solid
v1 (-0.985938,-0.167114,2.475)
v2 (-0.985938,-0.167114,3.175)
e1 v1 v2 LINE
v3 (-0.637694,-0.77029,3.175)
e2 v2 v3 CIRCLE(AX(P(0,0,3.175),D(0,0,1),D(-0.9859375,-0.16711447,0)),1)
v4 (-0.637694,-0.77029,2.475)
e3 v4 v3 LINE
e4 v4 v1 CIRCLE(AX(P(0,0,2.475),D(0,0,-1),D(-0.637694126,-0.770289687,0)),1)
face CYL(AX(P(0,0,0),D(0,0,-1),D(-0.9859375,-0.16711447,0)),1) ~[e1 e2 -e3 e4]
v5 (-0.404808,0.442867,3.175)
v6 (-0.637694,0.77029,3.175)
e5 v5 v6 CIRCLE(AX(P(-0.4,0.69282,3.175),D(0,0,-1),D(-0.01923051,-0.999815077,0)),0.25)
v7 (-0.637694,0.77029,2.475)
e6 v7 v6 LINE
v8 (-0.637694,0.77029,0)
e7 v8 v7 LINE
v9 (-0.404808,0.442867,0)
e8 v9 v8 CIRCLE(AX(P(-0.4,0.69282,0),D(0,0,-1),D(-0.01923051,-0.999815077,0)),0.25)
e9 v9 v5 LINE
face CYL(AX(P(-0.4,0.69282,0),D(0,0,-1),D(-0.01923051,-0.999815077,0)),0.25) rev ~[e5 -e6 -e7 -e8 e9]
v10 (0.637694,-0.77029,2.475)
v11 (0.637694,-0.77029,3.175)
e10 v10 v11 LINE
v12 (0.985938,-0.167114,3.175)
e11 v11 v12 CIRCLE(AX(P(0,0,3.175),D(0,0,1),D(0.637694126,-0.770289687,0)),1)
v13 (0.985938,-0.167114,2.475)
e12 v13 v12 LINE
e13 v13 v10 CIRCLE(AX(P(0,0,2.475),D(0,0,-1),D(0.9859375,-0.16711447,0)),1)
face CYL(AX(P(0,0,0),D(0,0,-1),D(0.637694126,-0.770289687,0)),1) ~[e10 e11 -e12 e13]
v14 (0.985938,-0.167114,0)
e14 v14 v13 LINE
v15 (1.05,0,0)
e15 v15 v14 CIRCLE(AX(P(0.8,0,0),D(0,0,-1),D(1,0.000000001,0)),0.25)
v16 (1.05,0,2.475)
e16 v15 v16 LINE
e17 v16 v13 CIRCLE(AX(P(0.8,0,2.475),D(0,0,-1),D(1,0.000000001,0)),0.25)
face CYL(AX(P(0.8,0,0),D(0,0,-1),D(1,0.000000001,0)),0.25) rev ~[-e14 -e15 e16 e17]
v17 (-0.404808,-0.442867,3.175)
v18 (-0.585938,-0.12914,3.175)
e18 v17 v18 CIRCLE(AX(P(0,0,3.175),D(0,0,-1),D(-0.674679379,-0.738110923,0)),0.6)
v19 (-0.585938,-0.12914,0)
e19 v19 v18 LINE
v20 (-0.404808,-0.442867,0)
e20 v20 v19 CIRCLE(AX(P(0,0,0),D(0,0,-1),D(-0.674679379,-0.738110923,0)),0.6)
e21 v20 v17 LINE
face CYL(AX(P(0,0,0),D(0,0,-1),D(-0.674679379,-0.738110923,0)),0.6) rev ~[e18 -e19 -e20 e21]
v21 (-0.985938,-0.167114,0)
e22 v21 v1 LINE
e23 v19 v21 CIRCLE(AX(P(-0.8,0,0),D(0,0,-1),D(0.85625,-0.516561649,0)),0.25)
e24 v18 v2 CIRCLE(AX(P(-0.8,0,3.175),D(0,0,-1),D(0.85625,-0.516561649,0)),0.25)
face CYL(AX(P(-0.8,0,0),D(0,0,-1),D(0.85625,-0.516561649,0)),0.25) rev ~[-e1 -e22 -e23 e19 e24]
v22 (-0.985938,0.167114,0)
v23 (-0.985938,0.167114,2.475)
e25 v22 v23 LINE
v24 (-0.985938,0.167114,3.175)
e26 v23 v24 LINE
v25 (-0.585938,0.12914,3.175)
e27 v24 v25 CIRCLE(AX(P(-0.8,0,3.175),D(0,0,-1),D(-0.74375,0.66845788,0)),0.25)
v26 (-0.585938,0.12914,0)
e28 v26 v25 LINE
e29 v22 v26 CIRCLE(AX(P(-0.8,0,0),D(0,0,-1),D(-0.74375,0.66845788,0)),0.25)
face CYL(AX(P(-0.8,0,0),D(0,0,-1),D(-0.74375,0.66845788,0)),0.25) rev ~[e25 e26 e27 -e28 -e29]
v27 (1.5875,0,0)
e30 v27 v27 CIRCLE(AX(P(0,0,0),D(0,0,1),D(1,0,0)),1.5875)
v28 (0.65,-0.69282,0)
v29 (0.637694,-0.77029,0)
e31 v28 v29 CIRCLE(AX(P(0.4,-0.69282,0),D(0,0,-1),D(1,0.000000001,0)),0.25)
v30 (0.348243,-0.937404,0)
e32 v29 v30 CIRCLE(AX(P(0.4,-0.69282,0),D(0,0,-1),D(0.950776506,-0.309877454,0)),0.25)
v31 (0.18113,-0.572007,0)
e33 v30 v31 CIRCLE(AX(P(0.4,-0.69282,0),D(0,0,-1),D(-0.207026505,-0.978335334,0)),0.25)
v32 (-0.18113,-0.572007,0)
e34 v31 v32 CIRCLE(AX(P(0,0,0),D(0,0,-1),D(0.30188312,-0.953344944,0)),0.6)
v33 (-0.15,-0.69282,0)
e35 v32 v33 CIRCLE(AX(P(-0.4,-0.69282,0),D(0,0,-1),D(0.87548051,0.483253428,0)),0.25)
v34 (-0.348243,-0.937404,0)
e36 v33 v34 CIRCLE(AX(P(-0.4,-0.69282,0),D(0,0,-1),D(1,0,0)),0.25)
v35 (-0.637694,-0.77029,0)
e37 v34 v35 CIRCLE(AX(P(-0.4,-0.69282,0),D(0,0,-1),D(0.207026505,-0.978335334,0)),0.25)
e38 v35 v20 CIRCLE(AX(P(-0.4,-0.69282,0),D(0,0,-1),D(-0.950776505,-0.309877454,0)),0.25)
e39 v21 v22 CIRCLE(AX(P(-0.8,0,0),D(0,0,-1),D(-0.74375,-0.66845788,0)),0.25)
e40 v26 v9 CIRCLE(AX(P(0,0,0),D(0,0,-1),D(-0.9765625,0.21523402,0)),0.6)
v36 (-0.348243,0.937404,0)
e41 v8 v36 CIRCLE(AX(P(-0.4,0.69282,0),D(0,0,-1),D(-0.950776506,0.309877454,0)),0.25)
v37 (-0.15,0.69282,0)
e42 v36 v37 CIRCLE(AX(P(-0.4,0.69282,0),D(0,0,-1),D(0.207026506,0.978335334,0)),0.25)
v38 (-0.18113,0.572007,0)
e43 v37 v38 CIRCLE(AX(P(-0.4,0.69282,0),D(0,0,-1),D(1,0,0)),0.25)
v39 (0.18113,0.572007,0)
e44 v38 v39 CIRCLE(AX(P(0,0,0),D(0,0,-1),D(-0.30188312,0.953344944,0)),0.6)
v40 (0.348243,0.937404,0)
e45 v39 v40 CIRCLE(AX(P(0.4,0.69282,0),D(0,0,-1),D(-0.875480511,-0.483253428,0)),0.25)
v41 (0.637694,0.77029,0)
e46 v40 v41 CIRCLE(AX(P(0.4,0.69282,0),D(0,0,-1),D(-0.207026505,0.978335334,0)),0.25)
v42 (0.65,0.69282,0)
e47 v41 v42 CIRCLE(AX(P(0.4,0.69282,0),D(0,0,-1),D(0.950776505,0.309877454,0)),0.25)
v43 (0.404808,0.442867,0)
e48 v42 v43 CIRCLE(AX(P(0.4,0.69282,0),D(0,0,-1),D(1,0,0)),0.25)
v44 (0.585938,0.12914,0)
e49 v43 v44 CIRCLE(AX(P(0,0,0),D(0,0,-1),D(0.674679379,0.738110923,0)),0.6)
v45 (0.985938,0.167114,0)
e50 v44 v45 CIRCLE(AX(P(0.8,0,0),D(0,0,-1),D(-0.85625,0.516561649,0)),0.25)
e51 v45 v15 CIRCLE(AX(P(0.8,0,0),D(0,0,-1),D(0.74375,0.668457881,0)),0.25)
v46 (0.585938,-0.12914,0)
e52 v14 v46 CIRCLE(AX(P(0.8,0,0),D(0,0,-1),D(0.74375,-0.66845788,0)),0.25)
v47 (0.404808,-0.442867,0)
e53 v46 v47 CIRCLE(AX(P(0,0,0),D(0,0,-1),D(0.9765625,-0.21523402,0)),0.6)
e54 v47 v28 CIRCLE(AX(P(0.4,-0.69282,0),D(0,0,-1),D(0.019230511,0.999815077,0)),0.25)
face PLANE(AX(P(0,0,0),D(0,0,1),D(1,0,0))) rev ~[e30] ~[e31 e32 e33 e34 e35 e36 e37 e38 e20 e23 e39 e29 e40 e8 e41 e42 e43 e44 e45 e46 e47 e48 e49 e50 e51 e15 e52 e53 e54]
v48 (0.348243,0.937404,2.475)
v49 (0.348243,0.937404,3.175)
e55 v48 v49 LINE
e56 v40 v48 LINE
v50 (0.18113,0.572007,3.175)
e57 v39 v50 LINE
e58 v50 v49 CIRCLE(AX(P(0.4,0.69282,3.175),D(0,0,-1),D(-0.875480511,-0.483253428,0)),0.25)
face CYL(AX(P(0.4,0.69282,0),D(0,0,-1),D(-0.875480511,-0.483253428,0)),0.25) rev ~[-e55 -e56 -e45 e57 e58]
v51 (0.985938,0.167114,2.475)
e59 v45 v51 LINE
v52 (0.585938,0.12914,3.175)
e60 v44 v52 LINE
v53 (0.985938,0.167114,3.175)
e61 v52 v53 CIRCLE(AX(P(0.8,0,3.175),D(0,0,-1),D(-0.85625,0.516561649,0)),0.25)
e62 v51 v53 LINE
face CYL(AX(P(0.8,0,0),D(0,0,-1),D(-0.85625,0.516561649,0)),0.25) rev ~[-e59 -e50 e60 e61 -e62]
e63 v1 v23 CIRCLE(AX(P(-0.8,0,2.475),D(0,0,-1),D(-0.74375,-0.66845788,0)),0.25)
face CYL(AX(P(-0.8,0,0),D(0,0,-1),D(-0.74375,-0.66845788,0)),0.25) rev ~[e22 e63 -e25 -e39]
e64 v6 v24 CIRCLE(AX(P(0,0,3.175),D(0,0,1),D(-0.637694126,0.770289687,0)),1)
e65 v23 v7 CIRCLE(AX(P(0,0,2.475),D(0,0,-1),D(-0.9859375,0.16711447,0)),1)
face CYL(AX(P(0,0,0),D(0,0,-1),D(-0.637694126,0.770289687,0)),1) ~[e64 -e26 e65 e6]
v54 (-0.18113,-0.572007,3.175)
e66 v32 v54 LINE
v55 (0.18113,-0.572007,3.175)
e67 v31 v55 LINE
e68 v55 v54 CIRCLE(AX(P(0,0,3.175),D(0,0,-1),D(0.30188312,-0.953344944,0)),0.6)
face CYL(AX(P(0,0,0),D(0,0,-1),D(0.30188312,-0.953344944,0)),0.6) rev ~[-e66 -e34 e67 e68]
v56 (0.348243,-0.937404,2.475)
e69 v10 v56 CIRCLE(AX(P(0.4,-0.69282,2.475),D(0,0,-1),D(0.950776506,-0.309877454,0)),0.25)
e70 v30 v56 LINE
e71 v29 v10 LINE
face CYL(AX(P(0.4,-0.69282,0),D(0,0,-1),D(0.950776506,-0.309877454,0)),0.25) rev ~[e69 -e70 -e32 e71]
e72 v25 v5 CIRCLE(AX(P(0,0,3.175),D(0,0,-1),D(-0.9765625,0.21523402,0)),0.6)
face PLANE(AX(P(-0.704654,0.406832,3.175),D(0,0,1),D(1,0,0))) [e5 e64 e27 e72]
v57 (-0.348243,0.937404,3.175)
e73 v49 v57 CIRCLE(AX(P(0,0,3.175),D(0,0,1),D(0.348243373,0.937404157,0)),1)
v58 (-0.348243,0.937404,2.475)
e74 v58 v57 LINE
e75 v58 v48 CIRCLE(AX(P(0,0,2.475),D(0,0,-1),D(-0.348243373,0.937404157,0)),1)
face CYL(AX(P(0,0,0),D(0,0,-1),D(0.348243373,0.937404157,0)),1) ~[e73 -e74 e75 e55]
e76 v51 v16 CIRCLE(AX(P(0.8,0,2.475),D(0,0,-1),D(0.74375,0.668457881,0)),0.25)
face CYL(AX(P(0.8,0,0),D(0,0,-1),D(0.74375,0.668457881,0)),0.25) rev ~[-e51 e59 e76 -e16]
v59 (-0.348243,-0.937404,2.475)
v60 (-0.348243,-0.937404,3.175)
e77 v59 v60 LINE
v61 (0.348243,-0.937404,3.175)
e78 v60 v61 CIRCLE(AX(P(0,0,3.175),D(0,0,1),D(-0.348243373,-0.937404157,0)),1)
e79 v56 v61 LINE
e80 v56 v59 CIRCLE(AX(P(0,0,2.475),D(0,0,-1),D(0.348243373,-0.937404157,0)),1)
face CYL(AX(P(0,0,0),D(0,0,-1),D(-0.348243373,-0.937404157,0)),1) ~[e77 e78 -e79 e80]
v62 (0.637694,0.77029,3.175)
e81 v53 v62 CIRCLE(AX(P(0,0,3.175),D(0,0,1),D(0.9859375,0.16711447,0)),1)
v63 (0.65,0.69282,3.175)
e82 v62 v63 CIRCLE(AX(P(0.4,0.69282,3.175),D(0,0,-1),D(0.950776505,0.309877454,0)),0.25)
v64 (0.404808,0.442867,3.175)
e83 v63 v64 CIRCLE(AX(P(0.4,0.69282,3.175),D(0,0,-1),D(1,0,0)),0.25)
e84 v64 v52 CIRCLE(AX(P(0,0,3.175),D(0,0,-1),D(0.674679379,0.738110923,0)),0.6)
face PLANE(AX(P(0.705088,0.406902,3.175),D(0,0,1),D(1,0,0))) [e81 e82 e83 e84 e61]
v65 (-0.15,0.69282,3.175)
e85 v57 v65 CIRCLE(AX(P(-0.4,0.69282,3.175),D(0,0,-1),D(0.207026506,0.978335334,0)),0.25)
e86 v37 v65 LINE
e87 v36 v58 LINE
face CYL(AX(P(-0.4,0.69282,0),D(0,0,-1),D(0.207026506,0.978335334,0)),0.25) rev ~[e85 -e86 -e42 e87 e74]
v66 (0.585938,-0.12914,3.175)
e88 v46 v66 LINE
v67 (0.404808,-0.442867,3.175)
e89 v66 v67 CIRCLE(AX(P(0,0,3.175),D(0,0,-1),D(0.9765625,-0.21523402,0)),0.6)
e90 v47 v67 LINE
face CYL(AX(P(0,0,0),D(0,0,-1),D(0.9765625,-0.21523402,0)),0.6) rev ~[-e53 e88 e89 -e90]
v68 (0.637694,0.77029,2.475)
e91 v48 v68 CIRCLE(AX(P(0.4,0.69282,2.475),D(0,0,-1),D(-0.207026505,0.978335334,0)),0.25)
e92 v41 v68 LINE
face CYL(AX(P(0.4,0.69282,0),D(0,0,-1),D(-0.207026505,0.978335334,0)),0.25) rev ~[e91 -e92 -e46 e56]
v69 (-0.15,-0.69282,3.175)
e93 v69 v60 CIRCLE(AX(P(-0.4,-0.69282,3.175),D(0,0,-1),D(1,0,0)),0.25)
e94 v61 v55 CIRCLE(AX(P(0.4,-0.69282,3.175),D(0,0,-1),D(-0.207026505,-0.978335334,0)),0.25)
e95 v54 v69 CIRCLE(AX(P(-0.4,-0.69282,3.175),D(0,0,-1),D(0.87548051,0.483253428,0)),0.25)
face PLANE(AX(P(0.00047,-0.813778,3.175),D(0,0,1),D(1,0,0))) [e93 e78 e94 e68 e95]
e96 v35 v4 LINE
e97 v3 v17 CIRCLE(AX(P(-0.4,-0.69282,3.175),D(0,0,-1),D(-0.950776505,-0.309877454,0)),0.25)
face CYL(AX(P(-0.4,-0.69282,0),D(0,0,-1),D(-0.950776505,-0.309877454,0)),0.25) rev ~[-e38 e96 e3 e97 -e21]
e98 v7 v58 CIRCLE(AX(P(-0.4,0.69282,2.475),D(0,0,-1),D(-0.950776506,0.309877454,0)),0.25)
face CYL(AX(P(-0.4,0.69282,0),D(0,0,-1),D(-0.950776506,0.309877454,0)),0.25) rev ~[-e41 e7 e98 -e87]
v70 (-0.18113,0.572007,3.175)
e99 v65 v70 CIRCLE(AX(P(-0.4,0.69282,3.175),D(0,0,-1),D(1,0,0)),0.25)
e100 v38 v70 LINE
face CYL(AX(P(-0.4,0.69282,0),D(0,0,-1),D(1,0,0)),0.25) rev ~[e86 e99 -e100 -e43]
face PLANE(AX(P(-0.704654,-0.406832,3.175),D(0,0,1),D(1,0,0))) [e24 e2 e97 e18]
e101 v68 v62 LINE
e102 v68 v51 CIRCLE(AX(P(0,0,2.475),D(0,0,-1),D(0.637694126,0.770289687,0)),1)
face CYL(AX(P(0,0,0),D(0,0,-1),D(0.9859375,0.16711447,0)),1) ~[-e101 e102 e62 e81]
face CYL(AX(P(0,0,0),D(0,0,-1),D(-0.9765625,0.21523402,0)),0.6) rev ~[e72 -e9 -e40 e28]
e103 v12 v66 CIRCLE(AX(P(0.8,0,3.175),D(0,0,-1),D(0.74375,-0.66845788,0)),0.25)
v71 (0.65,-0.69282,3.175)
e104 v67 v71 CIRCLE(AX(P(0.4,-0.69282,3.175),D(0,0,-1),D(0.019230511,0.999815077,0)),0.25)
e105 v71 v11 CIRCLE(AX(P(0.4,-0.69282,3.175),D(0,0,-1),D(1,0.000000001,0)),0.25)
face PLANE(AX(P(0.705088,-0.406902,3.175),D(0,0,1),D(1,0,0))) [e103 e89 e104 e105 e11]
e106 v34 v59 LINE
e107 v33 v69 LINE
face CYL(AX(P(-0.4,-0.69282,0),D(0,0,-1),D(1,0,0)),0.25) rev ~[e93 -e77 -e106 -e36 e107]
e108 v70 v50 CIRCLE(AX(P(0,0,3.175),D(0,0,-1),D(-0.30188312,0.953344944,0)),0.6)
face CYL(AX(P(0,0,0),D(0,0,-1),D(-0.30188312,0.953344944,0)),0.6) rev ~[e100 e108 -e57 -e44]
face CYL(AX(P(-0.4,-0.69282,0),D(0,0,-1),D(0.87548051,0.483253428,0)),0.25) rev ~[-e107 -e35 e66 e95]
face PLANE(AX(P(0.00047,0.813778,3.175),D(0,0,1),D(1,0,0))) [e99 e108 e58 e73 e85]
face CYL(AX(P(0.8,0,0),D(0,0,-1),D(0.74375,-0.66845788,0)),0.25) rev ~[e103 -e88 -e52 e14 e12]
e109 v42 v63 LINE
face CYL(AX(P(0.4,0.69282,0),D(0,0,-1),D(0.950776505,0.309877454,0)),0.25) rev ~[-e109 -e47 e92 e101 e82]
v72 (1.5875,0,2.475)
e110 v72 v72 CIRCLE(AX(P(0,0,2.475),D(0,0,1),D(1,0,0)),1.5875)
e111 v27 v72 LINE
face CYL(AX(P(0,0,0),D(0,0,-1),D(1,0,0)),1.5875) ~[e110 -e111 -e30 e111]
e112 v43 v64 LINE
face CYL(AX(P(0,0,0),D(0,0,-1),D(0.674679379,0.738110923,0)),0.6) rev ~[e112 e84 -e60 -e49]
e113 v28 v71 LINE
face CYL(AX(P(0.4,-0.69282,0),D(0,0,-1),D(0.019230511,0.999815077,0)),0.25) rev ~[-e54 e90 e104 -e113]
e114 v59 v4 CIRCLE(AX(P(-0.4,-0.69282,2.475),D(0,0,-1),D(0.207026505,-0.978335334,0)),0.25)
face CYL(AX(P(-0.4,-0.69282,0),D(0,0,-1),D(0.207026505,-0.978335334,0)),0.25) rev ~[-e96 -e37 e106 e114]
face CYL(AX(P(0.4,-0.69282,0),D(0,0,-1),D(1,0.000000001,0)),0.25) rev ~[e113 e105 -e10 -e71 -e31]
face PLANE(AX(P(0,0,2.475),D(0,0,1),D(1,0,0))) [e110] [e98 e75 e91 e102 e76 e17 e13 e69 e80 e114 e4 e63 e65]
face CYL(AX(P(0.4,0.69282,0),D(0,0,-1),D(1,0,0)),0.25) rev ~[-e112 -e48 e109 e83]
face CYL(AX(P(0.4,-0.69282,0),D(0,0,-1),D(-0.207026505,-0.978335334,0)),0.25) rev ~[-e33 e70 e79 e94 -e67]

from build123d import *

# Parameters (mm, degrees)
F1_DEPTH = 3.175
F0_R     = 1.5875
F2_DEPTH = 2.475


# Not quite as in the source:
# - a length typed as a fraction of an inch, garbled in the dataset ("3 / 203.2 mm" for 3/8 in), is restored


with BuildPart() as f1:
    # F0 (on Top) → F1 (new body)
    with BuildSketch(Plane.XY):
        with BuildLine():
            ThreePointArc((-0.5859375, 0.1291404123), (-0.5196152423, 0.3), (-0.4048076277, 0.4428665539))
            ThreePointArc((-0.4048076277, 0.4428665539), (-0.6037234698, 0.5479177769), (-0.6376941264, 0.7702896865))
            ThreePointArc((-0.6376941264, 0.7702896865), (-0.8660254038, 0.5), (-0.9859375, 0.16711447))
            ThreePointArc((-0.9859375, 0.16711447), (-0.7763724489, 0.2488809732), (-0.5859375, 0.1291404123))
        make_face()
    extrude(amount=F1_DEPTH)



with BuildPart() as f1b:
    # F0 (on Top) → F1, piece 2 (new body)
    with BuildSketch(Plane.XY):
        with BuildLine():
            ThreePointArc((-0.1811298723, 0.5720069662), (0, 0.6), (0.1811298723, 0.5720069662))
            ThreePointArc((0.1811298723, 0.5720069662), (0.1726489791, 0.7967987502), (0.3482433736, 0.9374041566))
            ThreePointArc((0.3482433736, 0.9374041566), (0, 1), (-0.3482433736, 0.9374041566))
            ThreePointArc((-0.3482433736, 0.9374041566), (-0.2057847115, 0.8502383071), (-0.15, 0.692820323))
            ThreePointArc((-0.15, 0.692820323), (-0.157907526, 0.6304405664), (-0.1811298723, 0.5720069662))
        make_face()
    extrude(amount=F1_DEPTH)


with BuildPart() as f1c:
    # F0 (on Top) → F1, piece 3 (new body)
    with BuildSketch(Plane.XY):
        with BuildLine():
            ThreePointArc((0.4048076277, 0.4428665539), (0.5196152423, 0.3), (0.5859375, 0.1291404123))
            ThreePointArc((0.5859375, 0.1291404123), (0.7763724489, 0.2488809732), (0.9859375, 0.16711447))
            ThreePointArc((0.9859375, 0.16711447), (0.8660254038, 0.5), (0.6376941264, 0.7702896865))
            ThreePointArc((0.6376941264, 0.7702896865), (0.6469043657, 0.732040652), (0.65, 0.692820323))
            ThreePointArc((0.65, 0.692820323), (0.5784683542, 0.5177516321), (0.4048076277, 0.4428665539))
        make_face()
    extrude(amount=F1_DEPTH)


with BuildPart() as f1d:
    # F0 (on Top) → F1, piece 4 (new body)
    with BuildSketch(Plane.XY):
        with BuildLine():
            ThreePointArc((0.9859375, -0.16711447), (0.7763724489, -0.2488809732), (0.5859375, -0.1291404123))
            ThreePointArc((0.5859375, -0.1291404123), (0.5196152423, -0.3), (0.4048076277, -0.4428665539))
            ThreePointArc((0.4048076277, -0.4428665539), (0.5784683542, -0.5177516321), (0.65, -0.692820323))
            ThreePointArc((0.65, -0.692820323), (0.6469043657, -0.732040652), (0.6376941264, -0.7702896865))
            ThreePointArc((0.6376941264, -0.7702896865), (0.8660254038, -0.5), (0.9859375, -0.16711447))
        make_face()
    extrude(amount=F1_DEPTH)


with BuildPart() as f1e:
    # F0 (on Top) → F1, piece 5 (new body)
    with BuildSketch(Plane.XY):
        with BuildLine():
            ThreePointArc((0.3482433736, -0.9374041566), (0.1726489791, -0.7967987502), (0.1811298723, -0.5720069662))
            ThreePointArc((0.1811298723, -0.5720069662), (0, -0.6), (-0.1811298723, -0.5720069662))
            ThreePointArc((-0.1811298723, -0.5720069662), (-0.157907526, -0.6304405664), (-0.15, -0.692820323))
            ThreePointArc((-0.15, -0.692820323), (-0.2057847115, -0.8502383071), (-0.3482433736, -0.9374041566))
            ThreePointArc((-0.3482433736, -0.9374041566), (0, -1), (0.3482433736, -0.9374041566))
        make_face()
    extrude(amount=F1_DEPTH)


with BuildPart() as f1f:
    # F0 (on Top) → F1, piece 6 (new body)
    with BuildSketch(Plane.XY):
        with BuildLine():
            ThreePointArc((-0.6376941264, -0.7702896865), (-0.6037234698, -0.5479177769), (-0.4048076277, -0.4428665539))
            ThreePointArc((-0.4048076277, -0.4428665539), (-0.5196152423, -0.3), (-0.5859375, -0.1291404123))
            ThreePointArc((-0.5859375, -0.1291404123), (-0.7763724489, -0.2488809732), (-0.9859375, -0.16711447))
            ThreePointArc((-0.9859375, -0.16711447), (-0.8660254038, -0.5), (-0.6376941264, -0.7702896865))
        make_face()
    extrude(amount=F1_DEPTH)


with BuildPart() as f1_1:
    add(f1.part)

    add(f1b.part)  # F2 merges F1b

    add(f1c.part)  # F2 merges F1c

    add(f1d.part)  # F2 merges F1d

    add(f1e.part)  # F2 merges F1e

    add(f1f.part)  # F2 merges F1f
    # F0 (on Top) → F2 (join)
    with BuildSketch(Plane.XY):
        Circle(F0_R)
        with BuildLine():
            ThreePointArc((0.6376941264, 0.7702896865), (0.8660254038, 0.5), (0.9859375, 0.16711447))
            ThreePointArc((0.9859375, 0.16711447), (1.0334356175, 0.0894863816), (1.05, 0))
            ThreePointArc((1.05, 0), (1.0334356175, -0.0894863816), (0.9859375, -0.16711447))
            ThreePointArc((0.9859375, -0.16711447), (0.8660254038, -0.5), (0.6376941264, -0.7702896865))
            ThreePointArc((0.6376941264, -0.7702896865), (0.525, -0.909326674), (0.3482433736, -0.9374041566))
            ThreePointArc((0.3482433736, -0.9374041566), (0, -1), (-0.3482433736, -0.9374041566))
            ThreePointArc((-0.3482433736, -0.9374041566), (-0.525, -0.909326674), (-0.6376941264, -0.7702896865))
            ThreePointArc((-0.6376941264, -0.7702896865), (-0.8660254038, -0.5), (-0.9859375, -0.16711447))
            ThreePointArc((-0.9859375, -0.16711447), (-1.05, 0), (-0.9859375, 0.16711447))
            ThreePointArc((-0.9859375, 0.16711447), (-0.8660254038, 0.5), (-0.6376941264, 0.7702896865))
            ThreePointArc((-0.6376941264, 0.7702896865), (-0.525, 0.909326674), (-0.3482433736, 0.9374041566))
            ThreePointArc((-0.3482433736, 0.9374041566), (0, 1), (0.3482433736, 0.9374041566))
            ThreePointArc((0.3482433736, 0.9374041566), (0.525, 0.909326674), (0.6376941264, 0.7702896865))
        make_face(mode=Mode.SUBTRACT)
    extrude(amount=F2_DEPTH)


solid = f1_1.part
